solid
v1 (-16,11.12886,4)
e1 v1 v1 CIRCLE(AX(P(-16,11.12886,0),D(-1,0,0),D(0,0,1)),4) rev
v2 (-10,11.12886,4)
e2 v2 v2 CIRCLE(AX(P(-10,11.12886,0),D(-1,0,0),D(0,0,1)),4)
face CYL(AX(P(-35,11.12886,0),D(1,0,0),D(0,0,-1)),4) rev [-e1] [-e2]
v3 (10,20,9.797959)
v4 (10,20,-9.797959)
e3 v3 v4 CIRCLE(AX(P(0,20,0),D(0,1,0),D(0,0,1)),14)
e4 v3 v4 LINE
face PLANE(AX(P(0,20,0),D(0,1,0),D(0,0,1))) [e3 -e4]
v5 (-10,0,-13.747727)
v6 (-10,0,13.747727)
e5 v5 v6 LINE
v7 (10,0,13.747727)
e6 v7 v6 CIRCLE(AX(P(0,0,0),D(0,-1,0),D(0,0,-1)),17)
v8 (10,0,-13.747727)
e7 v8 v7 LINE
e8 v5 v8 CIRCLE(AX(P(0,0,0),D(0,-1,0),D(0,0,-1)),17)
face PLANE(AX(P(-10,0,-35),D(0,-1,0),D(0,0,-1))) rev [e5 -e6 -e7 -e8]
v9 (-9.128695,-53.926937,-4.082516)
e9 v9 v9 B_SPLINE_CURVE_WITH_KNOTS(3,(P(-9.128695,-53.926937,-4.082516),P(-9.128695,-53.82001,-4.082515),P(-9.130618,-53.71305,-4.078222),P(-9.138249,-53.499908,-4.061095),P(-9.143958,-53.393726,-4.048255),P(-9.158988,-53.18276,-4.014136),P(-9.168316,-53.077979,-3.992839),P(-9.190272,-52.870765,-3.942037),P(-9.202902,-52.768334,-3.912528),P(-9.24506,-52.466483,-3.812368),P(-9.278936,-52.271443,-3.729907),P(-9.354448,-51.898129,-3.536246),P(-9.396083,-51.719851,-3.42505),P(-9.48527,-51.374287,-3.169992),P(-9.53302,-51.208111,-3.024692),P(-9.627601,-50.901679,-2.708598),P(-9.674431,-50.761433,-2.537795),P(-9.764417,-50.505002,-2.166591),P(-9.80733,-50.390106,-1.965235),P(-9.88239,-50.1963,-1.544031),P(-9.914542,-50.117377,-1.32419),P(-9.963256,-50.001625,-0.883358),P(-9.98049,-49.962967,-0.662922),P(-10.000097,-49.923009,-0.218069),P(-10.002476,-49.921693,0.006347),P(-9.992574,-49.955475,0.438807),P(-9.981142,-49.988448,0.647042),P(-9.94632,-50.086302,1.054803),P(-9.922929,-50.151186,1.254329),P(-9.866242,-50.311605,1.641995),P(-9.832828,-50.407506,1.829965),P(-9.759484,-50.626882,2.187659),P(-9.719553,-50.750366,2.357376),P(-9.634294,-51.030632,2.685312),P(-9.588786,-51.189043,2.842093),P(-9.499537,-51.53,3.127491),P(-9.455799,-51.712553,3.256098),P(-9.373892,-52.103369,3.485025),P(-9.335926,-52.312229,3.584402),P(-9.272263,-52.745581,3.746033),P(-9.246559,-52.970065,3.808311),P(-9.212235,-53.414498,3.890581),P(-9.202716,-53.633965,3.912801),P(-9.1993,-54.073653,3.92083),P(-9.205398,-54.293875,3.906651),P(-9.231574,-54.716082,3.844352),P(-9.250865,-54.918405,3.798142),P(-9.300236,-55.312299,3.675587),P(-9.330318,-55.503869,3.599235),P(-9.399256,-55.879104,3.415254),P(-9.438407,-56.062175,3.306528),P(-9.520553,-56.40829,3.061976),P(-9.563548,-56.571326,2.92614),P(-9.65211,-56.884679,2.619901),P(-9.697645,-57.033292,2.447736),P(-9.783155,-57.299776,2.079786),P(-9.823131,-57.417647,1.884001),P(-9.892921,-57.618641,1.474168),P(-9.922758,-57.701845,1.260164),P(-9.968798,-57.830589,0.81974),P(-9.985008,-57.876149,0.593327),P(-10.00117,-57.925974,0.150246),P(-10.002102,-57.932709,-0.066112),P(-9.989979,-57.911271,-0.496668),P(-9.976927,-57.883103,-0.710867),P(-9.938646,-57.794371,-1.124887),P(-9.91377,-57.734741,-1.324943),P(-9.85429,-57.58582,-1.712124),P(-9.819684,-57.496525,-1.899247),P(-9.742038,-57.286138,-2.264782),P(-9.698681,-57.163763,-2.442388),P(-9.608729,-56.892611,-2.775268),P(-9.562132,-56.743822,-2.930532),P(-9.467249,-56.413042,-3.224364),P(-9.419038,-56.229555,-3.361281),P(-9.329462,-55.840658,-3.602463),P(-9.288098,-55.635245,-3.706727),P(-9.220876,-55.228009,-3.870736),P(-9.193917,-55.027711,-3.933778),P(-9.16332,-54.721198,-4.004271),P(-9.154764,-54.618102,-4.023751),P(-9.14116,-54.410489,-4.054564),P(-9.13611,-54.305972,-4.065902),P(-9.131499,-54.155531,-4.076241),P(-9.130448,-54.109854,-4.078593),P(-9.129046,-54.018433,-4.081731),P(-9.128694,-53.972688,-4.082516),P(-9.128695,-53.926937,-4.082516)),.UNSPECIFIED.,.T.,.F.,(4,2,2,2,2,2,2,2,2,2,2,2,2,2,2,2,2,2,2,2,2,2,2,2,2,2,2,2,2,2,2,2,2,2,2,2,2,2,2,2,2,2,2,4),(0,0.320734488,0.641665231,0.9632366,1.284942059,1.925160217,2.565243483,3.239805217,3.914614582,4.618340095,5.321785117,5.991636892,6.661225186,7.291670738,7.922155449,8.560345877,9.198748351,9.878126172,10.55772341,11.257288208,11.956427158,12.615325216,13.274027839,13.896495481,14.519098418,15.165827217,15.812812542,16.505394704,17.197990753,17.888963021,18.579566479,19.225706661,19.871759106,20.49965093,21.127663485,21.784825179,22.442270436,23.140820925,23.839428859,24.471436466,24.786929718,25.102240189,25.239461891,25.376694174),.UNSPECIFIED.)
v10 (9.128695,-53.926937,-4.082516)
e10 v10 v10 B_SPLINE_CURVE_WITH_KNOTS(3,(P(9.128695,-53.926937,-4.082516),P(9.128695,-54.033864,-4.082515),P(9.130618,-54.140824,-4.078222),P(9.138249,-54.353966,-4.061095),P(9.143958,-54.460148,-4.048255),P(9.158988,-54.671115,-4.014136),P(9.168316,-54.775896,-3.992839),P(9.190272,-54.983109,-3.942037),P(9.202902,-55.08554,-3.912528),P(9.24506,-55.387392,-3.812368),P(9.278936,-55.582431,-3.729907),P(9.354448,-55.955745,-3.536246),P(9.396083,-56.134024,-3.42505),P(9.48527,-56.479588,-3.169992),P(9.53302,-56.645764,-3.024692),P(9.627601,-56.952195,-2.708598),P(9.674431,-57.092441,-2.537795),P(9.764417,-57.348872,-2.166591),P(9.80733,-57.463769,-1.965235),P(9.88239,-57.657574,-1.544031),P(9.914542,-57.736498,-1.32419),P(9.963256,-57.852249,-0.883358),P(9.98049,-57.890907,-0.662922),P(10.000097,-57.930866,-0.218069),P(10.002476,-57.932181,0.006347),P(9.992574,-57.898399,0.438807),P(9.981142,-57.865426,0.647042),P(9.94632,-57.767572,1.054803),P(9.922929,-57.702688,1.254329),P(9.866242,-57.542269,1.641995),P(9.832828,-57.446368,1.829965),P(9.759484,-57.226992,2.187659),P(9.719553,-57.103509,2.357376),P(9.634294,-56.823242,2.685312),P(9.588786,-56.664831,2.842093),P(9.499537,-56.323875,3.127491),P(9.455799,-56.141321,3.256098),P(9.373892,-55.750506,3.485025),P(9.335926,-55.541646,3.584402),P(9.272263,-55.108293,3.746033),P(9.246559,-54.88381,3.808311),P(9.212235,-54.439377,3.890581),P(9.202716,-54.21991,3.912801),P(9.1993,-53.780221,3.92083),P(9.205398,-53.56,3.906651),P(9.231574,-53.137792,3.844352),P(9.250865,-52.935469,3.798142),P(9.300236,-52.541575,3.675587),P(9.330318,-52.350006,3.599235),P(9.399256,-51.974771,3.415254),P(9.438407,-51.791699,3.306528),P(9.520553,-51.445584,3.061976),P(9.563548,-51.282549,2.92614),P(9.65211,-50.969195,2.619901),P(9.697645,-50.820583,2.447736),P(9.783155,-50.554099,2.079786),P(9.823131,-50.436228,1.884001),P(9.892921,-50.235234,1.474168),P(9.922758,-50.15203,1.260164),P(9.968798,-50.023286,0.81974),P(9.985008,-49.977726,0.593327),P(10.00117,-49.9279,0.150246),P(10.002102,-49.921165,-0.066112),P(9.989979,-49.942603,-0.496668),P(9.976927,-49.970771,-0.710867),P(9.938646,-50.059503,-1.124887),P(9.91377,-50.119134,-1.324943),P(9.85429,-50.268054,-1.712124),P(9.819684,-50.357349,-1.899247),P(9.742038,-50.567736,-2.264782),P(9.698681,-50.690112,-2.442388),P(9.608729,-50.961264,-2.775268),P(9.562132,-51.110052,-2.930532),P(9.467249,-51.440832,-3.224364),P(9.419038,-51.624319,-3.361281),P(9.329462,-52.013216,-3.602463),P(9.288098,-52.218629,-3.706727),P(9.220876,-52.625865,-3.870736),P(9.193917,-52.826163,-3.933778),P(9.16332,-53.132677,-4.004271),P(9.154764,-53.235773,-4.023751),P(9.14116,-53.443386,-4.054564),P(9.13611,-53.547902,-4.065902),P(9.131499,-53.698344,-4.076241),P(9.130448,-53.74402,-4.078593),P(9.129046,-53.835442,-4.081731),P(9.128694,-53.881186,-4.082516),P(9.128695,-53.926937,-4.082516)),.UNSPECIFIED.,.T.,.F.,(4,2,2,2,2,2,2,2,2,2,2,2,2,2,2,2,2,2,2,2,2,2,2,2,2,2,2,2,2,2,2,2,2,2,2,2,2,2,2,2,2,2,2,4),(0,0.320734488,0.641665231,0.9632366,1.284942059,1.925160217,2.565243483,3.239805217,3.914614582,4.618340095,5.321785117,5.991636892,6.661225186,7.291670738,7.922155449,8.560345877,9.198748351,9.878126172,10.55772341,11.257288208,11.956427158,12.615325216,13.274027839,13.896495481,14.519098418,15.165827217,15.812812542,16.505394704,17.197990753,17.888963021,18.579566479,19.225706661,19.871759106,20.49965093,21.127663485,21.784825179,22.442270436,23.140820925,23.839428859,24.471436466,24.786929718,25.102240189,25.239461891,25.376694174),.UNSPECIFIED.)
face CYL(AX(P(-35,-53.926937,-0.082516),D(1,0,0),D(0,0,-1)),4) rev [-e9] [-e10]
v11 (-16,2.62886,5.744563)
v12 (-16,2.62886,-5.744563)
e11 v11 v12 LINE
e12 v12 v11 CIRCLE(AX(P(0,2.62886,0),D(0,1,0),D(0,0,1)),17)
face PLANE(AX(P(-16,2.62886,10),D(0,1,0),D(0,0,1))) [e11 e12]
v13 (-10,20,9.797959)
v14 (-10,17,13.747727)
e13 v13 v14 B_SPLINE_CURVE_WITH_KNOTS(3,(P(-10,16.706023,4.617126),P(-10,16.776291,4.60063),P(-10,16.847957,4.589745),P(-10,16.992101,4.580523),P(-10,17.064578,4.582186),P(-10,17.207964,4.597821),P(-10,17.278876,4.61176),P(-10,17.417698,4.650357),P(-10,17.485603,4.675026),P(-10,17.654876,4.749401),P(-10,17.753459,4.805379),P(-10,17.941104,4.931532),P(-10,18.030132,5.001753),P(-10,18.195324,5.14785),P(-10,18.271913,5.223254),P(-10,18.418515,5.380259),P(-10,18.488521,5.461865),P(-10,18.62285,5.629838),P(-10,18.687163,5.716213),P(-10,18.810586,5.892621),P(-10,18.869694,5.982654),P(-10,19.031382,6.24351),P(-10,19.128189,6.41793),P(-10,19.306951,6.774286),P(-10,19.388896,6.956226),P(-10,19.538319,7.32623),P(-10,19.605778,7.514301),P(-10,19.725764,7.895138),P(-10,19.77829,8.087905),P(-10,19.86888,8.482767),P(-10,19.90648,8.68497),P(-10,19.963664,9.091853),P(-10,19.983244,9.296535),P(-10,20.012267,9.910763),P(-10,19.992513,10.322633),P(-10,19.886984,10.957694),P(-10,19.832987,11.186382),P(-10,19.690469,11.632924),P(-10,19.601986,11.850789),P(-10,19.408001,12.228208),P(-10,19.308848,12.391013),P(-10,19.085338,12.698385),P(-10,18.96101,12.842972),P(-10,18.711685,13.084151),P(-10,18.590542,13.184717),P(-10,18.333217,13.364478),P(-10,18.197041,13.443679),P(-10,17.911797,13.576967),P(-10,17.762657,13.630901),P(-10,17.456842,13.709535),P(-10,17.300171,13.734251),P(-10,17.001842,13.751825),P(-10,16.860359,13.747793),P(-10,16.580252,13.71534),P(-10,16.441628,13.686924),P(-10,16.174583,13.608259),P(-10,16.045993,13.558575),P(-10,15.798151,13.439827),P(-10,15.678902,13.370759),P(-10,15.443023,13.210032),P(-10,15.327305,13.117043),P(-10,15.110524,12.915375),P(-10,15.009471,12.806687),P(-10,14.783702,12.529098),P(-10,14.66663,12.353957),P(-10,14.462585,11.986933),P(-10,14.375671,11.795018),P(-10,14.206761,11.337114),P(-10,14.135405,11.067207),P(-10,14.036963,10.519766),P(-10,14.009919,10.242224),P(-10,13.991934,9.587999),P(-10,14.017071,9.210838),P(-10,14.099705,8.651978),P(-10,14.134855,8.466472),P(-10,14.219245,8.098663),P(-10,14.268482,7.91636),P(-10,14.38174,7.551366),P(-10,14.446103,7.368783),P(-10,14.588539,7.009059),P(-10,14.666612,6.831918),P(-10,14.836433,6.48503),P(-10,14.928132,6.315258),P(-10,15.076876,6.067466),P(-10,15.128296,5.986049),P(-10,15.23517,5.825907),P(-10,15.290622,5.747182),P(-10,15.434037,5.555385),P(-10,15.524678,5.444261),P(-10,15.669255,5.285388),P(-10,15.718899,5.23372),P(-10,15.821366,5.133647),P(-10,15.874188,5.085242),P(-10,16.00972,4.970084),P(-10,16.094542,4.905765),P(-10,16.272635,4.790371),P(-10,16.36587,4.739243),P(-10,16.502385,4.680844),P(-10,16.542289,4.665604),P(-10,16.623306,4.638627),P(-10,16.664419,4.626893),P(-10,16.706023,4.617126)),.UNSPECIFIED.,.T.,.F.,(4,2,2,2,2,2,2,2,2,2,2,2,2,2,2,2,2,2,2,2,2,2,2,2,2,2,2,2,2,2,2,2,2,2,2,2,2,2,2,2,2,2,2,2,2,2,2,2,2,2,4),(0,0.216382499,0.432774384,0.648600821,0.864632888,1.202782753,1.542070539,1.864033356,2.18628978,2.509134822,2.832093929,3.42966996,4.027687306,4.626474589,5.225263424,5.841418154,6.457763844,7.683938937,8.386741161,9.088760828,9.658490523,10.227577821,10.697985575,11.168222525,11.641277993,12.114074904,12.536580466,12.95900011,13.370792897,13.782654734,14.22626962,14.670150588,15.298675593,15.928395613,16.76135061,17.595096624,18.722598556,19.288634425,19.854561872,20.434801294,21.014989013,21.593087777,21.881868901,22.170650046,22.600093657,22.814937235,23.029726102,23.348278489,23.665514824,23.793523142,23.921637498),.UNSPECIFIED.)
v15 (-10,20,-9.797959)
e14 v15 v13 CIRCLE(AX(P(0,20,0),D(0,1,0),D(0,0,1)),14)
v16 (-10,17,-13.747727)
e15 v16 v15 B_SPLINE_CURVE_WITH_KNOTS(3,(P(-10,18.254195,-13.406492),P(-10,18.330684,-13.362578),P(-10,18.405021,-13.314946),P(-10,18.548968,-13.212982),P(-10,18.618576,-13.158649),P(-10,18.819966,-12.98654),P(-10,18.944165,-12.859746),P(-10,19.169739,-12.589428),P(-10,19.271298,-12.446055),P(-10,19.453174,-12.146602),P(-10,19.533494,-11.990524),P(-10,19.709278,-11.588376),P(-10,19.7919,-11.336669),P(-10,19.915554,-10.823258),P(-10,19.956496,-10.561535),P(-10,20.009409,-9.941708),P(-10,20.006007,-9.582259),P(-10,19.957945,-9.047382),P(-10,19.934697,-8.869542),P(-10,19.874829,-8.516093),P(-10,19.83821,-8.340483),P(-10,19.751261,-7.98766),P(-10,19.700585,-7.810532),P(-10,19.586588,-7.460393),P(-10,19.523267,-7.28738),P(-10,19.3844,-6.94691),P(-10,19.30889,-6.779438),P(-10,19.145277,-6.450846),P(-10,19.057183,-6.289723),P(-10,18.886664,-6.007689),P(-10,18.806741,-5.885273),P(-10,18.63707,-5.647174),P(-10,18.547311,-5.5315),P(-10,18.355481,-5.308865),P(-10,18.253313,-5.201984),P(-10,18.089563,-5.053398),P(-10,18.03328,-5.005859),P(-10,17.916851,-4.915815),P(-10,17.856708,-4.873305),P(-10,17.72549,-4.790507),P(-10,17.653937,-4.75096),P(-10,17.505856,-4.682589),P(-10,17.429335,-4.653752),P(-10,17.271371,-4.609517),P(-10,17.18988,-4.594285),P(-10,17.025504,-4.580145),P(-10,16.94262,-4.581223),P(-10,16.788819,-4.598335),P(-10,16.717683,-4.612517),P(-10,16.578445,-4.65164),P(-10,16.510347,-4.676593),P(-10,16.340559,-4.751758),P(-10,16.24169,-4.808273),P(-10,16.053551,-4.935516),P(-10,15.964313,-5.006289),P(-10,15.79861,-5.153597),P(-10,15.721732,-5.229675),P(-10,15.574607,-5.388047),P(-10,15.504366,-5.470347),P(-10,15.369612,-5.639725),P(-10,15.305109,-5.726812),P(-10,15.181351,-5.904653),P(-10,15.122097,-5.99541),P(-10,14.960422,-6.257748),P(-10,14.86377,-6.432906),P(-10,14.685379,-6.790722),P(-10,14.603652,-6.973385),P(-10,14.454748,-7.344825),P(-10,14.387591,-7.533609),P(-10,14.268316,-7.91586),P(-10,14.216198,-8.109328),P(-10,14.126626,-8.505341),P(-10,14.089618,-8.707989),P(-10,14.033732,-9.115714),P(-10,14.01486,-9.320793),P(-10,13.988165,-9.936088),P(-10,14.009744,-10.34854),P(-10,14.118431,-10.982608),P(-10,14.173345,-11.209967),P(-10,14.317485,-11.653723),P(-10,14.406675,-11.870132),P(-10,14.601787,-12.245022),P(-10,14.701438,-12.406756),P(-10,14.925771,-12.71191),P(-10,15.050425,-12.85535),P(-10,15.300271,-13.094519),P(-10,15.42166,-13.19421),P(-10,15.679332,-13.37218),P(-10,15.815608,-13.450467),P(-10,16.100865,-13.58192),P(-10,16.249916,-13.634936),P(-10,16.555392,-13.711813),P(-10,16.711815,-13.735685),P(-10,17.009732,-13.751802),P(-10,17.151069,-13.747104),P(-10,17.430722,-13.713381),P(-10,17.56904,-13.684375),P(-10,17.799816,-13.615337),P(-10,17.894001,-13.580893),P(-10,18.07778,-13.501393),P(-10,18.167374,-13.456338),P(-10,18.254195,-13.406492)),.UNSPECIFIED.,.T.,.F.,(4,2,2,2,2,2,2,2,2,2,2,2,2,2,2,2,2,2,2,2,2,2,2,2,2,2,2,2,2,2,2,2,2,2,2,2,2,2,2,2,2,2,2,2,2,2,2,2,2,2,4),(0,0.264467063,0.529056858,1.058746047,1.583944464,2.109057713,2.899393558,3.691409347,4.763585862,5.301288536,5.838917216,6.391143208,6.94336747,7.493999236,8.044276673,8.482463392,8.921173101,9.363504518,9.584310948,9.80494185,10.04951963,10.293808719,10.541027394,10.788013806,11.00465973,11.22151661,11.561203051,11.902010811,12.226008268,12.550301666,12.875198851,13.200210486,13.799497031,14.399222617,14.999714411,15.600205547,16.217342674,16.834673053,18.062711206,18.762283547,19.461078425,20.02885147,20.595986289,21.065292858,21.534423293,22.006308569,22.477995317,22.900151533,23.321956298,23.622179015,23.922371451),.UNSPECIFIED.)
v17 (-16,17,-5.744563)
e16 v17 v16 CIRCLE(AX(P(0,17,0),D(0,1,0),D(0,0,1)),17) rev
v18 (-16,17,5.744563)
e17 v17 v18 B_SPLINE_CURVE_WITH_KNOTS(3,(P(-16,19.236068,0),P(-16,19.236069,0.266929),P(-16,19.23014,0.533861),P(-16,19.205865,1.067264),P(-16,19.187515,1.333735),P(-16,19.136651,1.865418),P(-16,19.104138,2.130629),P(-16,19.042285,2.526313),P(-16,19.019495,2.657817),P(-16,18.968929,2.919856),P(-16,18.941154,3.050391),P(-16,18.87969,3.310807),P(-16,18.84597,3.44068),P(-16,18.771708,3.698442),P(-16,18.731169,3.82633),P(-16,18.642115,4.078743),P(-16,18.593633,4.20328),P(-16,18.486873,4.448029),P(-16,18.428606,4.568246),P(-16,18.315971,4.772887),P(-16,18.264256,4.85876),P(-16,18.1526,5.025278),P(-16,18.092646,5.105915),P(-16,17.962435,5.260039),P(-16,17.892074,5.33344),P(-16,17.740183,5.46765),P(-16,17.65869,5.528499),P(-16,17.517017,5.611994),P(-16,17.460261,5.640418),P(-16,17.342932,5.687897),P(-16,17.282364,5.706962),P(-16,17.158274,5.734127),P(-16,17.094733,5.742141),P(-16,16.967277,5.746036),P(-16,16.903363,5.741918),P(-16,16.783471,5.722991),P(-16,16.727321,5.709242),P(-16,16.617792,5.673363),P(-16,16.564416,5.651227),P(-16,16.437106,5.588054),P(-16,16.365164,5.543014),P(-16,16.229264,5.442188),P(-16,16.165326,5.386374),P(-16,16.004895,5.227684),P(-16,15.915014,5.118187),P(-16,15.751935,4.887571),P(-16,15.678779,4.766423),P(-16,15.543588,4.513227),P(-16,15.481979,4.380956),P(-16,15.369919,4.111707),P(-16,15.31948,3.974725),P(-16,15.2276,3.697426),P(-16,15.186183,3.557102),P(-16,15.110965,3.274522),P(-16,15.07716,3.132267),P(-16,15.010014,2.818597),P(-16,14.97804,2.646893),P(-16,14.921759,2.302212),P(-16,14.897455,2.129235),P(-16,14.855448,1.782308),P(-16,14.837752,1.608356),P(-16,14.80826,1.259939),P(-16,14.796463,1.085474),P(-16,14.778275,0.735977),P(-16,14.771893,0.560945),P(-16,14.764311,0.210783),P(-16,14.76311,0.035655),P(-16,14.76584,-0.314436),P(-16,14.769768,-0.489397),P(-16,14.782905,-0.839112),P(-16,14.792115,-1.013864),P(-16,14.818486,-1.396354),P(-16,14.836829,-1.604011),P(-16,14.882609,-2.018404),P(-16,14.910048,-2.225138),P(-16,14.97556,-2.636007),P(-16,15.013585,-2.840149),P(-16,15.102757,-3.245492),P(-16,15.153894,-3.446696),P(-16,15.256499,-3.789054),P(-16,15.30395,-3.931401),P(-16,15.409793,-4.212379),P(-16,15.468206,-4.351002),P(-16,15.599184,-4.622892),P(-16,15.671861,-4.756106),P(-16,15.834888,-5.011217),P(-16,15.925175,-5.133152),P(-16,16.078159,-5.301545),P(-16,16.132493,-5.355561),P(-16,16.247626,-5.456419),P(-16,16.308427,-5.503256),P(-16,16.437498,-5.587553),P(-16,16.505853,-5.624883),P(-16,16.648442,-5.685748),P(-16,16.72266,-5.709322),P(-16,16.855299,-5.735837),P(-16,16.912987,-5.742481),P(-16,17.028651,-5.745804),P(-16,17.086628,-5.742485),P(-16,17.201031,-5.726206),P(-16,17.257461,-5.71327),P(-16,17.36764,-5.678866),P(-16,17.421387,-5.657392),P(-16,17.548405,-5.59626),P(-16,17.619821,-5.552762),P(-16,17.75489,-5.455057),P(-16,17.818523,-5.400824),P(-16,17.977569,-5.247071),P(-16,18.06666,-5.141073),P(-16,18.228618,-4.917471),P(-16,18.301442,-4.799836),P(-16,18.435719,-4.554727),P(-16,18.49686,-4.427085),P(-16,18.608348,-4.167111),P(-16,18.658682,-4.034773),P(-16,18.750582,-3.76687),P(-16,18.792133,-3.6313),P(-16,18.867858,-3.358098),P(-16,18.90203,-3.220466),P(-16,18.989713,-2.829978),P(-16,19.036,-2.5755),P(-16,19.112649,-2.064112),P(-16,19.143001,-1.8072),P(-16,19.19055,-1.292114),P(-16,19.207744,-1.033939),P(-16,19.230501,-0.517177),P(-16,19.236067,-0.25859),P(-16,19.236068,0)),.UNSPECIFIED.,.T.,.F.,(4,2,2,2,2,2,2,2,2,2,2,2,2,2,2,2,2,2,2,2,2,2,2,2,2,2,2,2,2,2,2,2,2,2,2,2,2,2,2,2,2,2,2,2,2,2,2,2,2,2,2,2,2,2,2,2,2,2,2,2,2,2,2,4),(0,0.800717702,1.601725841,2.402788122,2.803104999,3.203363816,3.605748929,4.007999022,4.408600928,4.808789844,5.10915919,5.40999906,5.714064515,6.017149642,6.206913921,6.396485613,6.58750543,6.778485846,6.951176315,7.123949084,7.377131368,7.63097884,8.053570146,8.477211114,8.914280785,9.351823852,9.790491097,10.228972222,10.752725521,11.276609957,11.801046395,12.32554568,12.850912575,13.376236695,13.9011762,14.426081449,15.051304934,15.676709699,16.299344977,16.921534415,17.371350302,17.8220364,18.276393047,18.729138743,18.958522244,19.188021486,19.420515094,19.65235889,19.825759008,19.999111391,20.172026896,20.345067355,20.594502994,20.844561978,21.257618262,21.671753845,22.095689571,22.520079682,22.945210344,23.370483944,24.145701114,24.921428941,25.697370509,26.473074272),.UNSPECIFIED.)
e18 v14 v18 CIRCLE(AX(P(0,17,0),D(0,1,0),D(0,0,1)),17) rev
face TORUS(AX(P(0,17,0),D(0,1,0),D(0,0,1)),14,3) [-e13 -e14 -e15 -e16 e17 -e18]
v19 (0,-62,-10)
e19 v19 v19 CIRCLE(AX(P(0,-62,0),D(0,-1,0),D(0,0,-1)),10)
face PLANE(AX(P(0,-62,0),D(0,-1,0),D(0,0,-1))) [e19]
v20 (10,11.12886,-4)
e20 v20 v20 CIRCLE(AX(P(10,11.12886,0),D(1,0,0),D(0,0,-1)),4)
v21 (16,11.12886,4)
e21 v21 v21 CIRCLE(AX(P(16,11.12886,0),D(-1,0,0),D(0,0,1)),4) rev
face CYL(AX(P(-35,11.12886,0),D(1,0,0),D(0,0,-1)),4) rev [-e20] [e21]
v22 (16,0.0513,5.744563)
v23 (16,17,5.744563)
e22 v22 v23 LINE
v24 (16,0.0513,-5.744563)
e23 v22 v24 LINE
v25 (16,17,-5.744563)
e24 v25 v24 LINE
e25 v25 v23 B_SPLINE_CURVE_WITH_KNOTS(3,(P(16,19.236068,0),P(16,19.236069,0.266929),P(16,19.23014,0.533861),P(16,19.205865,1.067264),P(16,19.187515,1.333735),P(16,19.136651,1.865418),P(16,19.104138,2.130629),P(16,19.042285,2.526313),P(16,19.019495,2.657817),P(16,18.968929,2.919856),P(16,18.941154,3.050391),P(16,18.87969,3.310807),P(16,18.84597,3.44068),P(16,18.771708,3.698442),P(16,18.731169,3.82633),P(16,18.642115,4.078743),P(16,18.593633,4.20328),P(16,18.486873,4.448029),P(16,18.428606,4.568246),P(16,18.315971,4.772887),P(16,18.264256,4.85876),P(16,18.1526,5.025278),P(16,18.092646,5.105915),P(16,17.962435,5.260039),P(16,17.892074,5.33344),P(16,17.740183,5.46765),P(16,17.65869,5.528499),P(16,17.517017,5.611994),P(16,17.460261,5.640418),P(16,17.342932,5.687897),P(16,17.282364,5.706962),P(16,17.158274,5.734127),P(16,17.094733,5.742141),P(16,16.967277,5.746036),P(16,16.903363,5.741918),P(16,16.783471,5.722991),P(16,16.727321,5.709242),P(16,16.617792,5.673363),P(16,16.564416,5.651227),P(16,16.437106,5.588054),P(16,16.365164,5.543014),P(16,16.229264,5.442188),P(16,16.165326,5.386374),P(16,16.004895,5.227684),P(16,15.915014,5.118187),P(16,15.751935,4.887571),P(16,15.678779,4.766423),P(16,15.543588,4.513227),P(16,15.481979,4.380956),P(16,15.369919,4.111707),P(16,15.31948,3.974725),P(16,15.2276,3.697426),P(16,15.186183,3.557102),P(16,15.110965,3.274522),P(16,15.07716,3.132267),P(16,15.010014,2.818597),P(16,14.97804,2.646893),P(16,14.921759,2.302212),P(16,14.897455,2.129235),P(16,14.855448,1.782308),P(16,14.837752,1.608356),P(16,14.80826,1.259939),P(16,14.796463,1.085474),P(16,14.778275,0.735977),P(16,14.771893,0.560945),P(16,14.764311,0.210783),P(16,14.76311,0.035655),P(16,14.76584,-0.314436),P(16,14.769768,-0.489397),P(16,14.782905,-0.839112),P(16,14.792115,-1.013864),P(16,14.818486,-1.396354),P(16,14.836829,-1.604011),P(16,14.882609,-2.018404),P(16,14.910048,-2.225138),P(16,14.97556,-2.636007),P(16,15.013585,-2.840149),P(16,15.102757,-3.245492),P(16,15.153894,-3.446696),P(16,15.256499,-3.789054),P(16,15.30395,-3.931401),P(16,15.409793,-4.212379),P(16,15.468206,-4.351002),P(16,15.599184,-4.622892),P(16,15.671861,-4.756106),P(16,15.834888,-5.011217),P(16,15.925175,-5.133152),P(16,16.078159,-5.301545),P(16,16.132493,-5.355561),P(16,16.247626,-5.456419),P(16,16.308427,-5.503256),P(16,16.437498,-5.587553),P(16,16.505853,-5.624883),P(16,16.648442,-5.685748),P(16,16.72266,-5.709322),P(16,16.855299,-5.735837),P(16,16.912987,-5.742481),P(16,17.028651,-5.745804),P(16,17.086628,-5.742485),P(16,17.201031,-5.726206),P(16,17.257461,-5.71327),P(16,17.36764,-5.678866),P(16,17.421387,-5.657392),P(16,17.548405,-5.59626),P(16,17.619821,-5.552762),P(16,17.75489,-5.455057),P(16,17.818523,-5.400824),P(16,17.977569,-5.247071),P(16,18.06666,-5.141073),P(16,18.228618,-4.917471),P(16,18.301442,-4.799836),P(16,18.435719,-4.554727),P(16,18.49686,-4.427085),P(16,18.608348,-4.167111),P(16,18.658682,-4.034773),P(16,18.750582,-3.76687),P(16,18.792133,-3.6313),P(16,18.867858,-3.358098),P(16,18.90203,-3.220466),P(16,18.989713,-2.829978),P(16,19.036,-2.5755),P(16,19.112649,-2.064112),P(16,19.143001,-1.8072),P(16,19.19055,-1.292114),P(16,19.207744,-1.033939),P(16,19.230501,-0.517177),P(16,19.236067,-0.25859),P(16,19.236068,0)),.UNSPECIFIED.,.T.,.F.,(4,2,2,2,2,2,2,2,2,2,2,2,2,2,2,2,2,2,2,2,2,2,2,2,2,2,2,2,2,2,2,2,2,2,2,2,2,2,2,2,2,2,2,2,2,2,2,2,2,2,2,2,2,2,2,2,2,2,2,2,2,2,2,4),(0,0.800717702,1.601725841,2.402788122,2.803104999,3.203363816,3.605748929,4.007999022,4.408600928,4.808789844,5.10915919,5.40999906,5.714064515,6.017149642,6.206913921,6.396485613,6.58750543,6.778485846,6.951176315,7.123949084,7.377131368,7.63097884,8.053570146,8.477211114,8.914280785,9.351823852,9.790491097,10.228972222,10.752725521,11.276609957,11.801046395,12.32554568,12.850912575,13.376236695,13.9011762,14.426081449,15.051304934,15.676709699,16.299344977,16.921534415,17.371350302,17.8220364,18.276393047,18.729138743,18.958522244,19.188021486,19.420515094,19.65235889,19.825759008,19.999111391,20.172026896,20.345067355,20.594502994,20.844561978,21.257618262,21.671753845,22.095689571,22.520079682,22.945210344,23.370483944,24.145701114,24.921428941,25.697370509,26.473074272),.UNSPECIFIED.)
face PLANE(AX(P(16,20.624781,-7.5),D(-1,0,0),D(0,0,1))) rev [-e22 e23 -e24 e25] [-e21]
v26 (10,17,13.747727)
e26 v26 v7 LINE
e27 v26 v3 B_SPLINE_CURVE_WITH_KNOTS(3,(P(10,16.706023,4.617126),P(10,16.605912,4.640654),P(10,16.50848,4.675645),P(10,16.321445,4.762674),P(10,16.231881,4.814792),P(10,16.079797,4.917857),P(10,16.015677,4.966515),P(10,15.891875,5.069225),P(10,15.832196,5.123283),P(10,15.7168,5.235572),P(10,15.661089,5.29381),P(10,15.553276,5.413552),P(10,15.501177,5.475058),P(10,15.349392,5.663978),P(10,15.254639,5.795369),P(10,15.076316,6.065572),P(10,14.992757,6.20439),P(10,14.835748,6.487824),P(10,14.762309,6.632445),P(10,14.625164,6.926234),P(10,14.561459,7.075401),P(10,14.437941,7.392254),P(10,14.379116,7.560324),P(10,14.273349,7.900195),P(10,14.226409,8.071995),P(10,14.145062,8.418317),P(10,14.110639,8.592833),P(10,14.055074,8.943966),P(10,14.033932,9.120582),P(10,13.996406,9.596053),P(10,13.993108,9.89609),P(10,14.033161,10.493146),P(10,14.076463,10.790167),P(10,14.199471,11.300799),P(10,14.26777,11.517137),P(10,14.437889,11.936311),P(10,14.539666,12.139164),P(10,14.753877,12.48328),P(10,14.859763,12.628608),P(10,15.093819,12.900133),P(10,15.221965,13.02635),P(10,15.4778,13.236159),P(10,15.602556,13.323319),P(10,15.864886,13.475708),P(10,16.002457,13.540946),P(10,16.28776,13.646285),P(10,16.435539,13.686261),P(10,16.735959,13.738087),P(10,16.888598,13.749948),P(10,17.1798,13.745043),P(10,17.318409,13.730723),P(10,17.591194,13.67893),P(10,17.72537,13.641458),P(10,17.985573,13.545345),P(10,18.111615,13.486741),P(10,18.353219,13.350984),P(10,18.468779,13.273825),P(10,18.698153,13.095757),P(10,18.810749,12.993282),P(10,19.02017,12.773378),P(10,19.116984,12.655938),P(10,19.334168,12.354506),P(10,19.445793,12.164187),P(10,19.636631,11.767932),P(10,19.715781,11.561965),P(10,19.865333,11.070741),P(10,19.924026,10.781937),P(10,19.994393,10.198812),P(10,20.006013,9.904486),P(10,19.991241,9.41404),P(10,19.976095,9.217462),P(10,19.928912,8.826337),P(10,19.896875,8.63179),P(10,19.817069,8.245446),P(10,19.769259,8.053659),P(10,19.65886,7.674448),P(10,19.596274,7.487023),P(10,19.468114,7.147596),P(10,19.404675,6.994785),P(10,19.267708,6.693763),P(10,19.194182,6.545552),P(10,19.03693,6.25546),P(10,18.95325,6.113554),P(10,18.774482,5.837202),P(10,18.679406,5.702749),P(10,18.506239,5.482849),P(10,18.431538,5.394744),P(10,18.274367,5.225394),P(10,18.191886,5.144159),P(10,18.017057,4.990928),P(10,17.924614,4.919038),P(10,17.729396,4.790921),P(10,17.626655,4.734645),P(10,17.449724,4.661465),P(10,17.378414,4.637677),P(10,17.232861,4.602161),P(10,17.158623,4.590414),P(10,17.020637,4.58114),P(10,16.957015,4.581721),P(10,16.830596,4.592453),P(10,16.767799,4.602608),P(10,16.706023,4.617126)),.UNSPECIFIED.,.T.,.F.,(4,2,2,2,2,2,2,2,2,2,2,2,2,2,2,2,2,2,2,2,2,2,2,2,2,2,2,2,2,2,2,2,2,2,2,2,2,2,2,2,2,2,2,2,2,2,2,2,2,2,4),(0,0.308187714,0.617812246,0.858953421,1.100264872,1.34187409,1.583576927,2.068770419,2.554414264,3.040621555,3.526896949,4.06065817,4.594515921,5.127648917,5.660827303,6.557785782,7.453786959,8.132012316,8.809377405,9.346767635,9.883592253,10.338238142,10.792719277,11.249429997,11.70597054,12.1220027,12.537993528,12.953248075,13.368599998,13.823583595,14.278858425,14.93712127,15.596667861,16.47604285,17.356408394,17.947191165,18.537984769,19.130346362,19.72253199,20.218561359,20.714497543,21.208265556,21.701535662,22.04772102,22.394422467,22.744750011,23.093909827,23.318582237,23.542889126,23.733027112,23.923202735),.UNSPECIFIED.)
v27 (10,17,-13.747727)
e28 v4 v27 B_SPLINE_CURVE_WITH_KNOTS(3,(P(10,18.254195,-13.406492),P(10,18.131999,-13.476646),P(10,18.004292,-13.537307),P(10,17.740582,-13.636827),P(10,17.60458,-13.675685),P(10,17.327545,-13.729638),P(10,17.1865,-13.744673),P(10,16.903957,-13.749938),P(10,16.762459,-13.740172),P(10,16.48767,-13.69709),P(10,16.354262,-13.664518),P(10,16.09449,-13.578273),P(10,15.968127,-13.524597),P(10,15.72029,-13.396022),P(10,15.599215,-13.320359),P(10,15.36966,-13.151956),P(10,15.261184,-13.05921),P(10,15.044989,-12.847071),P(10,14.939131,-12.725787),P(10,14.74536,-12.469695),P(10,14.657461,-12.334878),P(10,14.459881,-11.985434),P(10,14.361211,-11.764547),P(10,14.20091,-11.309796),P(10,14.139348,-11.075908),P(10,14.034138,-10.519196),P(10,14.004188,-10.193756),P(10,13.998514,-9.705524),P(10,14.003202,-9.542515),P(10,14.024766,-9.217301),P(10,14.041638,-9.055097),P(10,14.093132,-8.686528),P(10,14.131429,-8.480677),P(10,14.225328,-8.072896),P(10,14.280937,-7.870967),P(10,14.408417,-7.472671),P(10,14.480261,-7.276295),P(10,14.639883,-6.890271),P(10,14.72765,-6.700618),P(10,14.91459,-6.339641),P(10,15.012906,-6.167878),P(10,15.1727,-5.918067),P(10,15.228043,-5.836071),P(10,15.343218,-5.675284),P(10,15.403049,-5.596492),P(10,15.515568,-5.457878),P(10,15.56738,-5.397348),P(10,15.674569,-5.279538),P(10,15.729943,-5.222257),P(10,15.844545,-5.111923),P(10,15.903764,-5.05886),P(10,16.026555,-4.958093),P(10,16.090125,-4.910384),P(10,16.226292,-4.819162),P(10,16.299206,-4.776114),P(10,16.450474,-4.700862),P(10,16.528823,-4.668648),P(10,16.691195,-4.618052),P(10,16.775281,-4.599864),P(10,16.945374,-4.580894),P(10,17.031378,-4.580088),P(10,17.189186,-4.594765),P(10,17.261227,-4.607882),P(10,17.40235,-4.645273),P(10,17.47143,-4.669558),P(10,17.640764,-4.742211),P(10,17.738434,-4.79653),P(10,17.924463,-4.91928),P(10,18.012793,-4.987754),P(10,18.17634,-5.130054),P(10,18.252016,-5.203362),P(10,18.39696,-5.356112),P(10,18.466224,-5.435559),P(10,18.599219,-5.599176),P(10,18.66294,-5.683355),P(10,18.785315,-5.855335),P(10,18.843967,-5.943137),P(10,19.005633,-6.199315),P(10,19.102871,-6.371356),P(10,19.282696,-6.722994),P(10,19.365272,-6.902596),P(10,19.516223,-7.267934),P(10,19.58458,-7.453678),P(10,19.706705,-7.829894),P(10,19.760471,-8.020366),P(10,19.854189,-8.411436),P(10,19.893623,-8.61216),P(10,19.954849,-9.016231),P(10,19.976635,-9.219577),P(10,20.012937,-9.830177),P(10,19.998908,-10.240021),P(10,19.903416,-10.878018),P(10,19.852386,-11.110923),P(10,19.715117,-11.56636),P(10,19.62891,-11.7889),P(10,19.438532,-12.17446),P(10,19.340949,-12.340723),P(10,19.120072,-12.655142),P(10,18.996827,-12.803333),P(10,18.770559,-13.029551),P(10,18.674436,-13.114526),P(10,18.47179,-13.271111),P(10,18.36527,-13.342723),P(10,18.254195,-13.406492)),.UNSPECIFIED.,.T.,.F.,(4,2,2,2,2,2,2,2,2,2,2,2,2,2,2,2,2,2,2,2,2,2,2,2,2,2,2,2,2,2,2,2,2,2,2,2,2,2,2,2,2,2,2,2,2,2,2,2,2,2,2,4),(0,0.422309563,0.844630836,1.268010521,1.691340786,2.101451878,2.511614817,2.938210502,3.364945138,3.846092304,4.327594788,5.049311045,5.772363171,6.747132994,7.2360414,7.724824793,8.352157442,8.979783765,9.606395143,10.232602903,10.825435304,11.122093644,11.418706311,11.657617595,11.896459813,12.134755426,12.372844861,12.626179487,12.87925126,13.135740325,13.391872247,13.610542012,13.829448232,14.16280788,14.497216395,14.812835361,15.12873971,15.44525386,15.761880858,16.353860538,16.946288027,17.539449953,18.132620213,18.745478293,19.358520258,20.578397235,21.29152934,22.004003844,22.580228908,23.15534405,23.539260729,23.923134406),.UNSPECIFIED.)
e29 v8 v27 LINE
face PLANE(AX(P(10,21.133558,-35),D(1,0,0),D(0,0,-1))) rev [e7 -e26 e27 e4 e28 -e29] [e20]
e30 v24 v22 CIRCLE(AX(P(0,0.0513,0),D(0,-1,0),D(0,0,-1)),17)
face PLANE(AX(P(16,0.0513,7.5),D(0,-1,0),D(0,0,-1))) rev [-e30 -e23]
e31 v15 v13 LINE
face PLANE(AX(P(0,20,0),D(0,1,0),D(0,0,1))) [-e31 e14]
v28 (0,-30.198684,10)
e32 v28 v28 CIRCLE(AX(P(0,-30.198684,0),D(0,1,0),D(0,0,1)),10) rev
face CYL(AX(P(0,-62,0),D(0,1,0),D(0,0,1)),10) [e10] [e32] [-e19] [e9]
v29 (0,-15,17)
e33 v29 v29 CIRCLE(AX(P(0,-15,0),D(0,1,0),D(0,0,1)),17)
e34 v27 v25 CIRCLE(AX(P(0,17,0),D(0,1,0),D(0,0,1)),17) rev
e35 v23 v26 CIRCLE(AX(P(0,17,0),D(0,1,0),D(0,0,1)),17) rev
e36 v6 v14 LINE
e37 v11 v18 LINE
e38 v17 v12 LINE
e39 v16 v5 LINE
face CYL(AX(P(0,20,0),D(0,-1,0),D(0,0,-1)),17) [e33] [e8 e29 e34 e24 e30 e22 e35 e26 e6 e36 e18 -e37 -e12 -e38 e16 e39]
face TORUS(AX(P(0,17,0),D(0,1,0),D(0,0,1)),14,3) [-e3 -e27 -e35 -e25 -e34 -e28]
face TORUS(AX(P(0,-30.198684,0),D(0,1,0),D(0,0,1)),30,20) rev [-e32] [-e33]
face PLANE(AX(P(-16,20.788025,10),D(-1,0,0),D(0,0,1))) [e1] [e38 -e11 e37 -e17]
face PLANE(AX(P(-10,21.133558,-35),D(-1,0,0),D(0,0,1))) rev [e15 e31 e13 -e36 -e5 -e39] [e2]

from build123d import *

# Parameters (mm, degrees)
EXTRUDE_START       = -15
SKETCH_1_R          = 17
EXTRUDE_1_DEPTH     = 35
SKETCH_2_R          = 10
EXTRUDE_2_DEPTH     = 47
FILLET_3_R          = 3
FILLET_4_R          = 20
SKETCH_4_W          = 20
SKETCH_4_H          = 21.133558335
CUT_EXTRUDE_2_DEPTH = 35
SKETCH_5_R          = 4
CUT_EXTRUDE_3_DEPTH = 35
CUT_EXTRUDE_START   = 20
SKETCH_6_W          = 15
SKETCH_6_H          = 20.573480962
CUT_EXTRUDE_4_DEPTH = 4
CUT_EXTRUDE_START_2 = -20
SKETCH_7_W          = 20
SKETCH_7_H          = 18.159164137
CUT_EXTRUDE_5_DEPTH = 4
SKETCH_8_R          = 4
CUT_EXTRUDE_6_DEPTH = 35


with BuildPart() as part:
    # Эскиз1 → Вытянуть1 (new body)
    with BuildSketch(Plane(origin=(0, 0, 0), x_dir=(1, 0, 0), z_dir=(0, 1, 0)).offset(EXTRUDE_START)):
        with Locations(Location((0, 0, 0), (0, 0, 270))):
            Circle(SKETCH_1_R)
    extrude(amount=EXTRUDE_1_DEPTH)

    # Эскиз2 → Вытянуть2 (add)
    with BuildSketch(Plane.XZ.offset(15)):
        with Locations(Location((0, 0, 0), (0, 0, 90))):
            Circle(SKETCH_2_R)
    extrude(amount=EXTRUDE_2_DEPTH)

    # Скругление3
    fillet_3_edges = [part.edges().sort_by_distance(p)[0] for p in [
        (0, 20, -17),
    ]]
    fillet(fillet_3_edges, radius=FILLET_3_R)

    # Скругление4
    # the kernel refuses this fillet: 20 mm, written as the material it adds along each edge
    with BuildSketch(Plane(origin=(0, -15, 0), x_dir=(0, 0, 1), z_dir=(1, 0, 0))) as fillet_4_piece_1:
        with BuildLine():
            CenterArc((30, 15.198684154), FILLET_4_R, 180, 49.458398126)
            Line((10, 15.198684154), (9.6, 15.198684154))
            Line((9.6, 15.198684154), (9.6, 0))
            Line((9.6, 0), (10, -0.4))
            ThreePointArc((10, -0.4), (13.5, -0.4), (16.74, -0.303973683))
            Line((16.74, -0.303973683), (17, 0))
        make_face()
    revolve(axis=Axis((0, -15, 0), (0, -1, 0)))

    # Эскиз4 → Вырез-Вытянуть2 (cut, symmetric)
    with BuildSketch(Plane.XY):
        with Locations((0, 10.566779168)):
            Rectangle(SKETCH_4_W, SKETCH_4_H)
    extrude(amount=CUT_EXTRUDE_2_DEPTH, both=True, mode=Mode.SUBTRACT)

    # Эскиз5 → Вырез-Вытянуть3 (cut, symmetric)
    with BuildSketch(Plane(origin=(0, 0, 0), x_dir=(0, 0, -1), z_dir=(1, 0, 0))):
        with Locations((0, 11.128860454)):
            Circle(SKETCH_5_R)
    extrude(amount=CUT_EXTRUDE_3_DEPTH, both=True, mode=Mode.SUBTRACT)

    # Эскиз6 → Вырез-Вытянуть4 (cut)
    with BuildSketch(Plane(origin=(0, 0, 0), x_dir=(0, 0, -1), z_dir=(1, 0, 0)).offset(CUT_EXTRUDE_START)):
        with Locations((0, 10.338040732)):
            Rectangle(SKETCH_6_W, SKETCH_6_H)
    extrude(amount=-CUT_EXTRUDE_4_DEPTH, mode=Mode.SUBTRACT)

    # Эскиз7 → Вырез-Вытянуть5 (cut)
    with BuildSketch(Plane(origin=(0, 0, 0), x_dir=(0, 0, -1), z_dir=(1, 0, 0)).offset(CUT_EXTRUDE_START_2)):
        with Locations((0, 11.708442525)):
            Rectangle(SKETCH_7_W, SKETCH_7_H)
    extrude(amount=CUT_EXTRUDE_5_DEPTH, mode=Mode.SUBTRACT)

    # Эскиз8 → Вырез-Вытянуть6 (cut, symmetric)
    with BuildSketch(Plane(origin=(0, 0, 0), x_dir=(0, 0, -1), z_dir=(1, 0, 0))):
        with Locations((0.082515947, -53.926937182)):
            Circle(SKETCH_8_R)
    extrude(amount=CUT_EXTRUDE_6_DEPTH, both=True, mode=Mode.SUBTRACT)


solid = part.part
